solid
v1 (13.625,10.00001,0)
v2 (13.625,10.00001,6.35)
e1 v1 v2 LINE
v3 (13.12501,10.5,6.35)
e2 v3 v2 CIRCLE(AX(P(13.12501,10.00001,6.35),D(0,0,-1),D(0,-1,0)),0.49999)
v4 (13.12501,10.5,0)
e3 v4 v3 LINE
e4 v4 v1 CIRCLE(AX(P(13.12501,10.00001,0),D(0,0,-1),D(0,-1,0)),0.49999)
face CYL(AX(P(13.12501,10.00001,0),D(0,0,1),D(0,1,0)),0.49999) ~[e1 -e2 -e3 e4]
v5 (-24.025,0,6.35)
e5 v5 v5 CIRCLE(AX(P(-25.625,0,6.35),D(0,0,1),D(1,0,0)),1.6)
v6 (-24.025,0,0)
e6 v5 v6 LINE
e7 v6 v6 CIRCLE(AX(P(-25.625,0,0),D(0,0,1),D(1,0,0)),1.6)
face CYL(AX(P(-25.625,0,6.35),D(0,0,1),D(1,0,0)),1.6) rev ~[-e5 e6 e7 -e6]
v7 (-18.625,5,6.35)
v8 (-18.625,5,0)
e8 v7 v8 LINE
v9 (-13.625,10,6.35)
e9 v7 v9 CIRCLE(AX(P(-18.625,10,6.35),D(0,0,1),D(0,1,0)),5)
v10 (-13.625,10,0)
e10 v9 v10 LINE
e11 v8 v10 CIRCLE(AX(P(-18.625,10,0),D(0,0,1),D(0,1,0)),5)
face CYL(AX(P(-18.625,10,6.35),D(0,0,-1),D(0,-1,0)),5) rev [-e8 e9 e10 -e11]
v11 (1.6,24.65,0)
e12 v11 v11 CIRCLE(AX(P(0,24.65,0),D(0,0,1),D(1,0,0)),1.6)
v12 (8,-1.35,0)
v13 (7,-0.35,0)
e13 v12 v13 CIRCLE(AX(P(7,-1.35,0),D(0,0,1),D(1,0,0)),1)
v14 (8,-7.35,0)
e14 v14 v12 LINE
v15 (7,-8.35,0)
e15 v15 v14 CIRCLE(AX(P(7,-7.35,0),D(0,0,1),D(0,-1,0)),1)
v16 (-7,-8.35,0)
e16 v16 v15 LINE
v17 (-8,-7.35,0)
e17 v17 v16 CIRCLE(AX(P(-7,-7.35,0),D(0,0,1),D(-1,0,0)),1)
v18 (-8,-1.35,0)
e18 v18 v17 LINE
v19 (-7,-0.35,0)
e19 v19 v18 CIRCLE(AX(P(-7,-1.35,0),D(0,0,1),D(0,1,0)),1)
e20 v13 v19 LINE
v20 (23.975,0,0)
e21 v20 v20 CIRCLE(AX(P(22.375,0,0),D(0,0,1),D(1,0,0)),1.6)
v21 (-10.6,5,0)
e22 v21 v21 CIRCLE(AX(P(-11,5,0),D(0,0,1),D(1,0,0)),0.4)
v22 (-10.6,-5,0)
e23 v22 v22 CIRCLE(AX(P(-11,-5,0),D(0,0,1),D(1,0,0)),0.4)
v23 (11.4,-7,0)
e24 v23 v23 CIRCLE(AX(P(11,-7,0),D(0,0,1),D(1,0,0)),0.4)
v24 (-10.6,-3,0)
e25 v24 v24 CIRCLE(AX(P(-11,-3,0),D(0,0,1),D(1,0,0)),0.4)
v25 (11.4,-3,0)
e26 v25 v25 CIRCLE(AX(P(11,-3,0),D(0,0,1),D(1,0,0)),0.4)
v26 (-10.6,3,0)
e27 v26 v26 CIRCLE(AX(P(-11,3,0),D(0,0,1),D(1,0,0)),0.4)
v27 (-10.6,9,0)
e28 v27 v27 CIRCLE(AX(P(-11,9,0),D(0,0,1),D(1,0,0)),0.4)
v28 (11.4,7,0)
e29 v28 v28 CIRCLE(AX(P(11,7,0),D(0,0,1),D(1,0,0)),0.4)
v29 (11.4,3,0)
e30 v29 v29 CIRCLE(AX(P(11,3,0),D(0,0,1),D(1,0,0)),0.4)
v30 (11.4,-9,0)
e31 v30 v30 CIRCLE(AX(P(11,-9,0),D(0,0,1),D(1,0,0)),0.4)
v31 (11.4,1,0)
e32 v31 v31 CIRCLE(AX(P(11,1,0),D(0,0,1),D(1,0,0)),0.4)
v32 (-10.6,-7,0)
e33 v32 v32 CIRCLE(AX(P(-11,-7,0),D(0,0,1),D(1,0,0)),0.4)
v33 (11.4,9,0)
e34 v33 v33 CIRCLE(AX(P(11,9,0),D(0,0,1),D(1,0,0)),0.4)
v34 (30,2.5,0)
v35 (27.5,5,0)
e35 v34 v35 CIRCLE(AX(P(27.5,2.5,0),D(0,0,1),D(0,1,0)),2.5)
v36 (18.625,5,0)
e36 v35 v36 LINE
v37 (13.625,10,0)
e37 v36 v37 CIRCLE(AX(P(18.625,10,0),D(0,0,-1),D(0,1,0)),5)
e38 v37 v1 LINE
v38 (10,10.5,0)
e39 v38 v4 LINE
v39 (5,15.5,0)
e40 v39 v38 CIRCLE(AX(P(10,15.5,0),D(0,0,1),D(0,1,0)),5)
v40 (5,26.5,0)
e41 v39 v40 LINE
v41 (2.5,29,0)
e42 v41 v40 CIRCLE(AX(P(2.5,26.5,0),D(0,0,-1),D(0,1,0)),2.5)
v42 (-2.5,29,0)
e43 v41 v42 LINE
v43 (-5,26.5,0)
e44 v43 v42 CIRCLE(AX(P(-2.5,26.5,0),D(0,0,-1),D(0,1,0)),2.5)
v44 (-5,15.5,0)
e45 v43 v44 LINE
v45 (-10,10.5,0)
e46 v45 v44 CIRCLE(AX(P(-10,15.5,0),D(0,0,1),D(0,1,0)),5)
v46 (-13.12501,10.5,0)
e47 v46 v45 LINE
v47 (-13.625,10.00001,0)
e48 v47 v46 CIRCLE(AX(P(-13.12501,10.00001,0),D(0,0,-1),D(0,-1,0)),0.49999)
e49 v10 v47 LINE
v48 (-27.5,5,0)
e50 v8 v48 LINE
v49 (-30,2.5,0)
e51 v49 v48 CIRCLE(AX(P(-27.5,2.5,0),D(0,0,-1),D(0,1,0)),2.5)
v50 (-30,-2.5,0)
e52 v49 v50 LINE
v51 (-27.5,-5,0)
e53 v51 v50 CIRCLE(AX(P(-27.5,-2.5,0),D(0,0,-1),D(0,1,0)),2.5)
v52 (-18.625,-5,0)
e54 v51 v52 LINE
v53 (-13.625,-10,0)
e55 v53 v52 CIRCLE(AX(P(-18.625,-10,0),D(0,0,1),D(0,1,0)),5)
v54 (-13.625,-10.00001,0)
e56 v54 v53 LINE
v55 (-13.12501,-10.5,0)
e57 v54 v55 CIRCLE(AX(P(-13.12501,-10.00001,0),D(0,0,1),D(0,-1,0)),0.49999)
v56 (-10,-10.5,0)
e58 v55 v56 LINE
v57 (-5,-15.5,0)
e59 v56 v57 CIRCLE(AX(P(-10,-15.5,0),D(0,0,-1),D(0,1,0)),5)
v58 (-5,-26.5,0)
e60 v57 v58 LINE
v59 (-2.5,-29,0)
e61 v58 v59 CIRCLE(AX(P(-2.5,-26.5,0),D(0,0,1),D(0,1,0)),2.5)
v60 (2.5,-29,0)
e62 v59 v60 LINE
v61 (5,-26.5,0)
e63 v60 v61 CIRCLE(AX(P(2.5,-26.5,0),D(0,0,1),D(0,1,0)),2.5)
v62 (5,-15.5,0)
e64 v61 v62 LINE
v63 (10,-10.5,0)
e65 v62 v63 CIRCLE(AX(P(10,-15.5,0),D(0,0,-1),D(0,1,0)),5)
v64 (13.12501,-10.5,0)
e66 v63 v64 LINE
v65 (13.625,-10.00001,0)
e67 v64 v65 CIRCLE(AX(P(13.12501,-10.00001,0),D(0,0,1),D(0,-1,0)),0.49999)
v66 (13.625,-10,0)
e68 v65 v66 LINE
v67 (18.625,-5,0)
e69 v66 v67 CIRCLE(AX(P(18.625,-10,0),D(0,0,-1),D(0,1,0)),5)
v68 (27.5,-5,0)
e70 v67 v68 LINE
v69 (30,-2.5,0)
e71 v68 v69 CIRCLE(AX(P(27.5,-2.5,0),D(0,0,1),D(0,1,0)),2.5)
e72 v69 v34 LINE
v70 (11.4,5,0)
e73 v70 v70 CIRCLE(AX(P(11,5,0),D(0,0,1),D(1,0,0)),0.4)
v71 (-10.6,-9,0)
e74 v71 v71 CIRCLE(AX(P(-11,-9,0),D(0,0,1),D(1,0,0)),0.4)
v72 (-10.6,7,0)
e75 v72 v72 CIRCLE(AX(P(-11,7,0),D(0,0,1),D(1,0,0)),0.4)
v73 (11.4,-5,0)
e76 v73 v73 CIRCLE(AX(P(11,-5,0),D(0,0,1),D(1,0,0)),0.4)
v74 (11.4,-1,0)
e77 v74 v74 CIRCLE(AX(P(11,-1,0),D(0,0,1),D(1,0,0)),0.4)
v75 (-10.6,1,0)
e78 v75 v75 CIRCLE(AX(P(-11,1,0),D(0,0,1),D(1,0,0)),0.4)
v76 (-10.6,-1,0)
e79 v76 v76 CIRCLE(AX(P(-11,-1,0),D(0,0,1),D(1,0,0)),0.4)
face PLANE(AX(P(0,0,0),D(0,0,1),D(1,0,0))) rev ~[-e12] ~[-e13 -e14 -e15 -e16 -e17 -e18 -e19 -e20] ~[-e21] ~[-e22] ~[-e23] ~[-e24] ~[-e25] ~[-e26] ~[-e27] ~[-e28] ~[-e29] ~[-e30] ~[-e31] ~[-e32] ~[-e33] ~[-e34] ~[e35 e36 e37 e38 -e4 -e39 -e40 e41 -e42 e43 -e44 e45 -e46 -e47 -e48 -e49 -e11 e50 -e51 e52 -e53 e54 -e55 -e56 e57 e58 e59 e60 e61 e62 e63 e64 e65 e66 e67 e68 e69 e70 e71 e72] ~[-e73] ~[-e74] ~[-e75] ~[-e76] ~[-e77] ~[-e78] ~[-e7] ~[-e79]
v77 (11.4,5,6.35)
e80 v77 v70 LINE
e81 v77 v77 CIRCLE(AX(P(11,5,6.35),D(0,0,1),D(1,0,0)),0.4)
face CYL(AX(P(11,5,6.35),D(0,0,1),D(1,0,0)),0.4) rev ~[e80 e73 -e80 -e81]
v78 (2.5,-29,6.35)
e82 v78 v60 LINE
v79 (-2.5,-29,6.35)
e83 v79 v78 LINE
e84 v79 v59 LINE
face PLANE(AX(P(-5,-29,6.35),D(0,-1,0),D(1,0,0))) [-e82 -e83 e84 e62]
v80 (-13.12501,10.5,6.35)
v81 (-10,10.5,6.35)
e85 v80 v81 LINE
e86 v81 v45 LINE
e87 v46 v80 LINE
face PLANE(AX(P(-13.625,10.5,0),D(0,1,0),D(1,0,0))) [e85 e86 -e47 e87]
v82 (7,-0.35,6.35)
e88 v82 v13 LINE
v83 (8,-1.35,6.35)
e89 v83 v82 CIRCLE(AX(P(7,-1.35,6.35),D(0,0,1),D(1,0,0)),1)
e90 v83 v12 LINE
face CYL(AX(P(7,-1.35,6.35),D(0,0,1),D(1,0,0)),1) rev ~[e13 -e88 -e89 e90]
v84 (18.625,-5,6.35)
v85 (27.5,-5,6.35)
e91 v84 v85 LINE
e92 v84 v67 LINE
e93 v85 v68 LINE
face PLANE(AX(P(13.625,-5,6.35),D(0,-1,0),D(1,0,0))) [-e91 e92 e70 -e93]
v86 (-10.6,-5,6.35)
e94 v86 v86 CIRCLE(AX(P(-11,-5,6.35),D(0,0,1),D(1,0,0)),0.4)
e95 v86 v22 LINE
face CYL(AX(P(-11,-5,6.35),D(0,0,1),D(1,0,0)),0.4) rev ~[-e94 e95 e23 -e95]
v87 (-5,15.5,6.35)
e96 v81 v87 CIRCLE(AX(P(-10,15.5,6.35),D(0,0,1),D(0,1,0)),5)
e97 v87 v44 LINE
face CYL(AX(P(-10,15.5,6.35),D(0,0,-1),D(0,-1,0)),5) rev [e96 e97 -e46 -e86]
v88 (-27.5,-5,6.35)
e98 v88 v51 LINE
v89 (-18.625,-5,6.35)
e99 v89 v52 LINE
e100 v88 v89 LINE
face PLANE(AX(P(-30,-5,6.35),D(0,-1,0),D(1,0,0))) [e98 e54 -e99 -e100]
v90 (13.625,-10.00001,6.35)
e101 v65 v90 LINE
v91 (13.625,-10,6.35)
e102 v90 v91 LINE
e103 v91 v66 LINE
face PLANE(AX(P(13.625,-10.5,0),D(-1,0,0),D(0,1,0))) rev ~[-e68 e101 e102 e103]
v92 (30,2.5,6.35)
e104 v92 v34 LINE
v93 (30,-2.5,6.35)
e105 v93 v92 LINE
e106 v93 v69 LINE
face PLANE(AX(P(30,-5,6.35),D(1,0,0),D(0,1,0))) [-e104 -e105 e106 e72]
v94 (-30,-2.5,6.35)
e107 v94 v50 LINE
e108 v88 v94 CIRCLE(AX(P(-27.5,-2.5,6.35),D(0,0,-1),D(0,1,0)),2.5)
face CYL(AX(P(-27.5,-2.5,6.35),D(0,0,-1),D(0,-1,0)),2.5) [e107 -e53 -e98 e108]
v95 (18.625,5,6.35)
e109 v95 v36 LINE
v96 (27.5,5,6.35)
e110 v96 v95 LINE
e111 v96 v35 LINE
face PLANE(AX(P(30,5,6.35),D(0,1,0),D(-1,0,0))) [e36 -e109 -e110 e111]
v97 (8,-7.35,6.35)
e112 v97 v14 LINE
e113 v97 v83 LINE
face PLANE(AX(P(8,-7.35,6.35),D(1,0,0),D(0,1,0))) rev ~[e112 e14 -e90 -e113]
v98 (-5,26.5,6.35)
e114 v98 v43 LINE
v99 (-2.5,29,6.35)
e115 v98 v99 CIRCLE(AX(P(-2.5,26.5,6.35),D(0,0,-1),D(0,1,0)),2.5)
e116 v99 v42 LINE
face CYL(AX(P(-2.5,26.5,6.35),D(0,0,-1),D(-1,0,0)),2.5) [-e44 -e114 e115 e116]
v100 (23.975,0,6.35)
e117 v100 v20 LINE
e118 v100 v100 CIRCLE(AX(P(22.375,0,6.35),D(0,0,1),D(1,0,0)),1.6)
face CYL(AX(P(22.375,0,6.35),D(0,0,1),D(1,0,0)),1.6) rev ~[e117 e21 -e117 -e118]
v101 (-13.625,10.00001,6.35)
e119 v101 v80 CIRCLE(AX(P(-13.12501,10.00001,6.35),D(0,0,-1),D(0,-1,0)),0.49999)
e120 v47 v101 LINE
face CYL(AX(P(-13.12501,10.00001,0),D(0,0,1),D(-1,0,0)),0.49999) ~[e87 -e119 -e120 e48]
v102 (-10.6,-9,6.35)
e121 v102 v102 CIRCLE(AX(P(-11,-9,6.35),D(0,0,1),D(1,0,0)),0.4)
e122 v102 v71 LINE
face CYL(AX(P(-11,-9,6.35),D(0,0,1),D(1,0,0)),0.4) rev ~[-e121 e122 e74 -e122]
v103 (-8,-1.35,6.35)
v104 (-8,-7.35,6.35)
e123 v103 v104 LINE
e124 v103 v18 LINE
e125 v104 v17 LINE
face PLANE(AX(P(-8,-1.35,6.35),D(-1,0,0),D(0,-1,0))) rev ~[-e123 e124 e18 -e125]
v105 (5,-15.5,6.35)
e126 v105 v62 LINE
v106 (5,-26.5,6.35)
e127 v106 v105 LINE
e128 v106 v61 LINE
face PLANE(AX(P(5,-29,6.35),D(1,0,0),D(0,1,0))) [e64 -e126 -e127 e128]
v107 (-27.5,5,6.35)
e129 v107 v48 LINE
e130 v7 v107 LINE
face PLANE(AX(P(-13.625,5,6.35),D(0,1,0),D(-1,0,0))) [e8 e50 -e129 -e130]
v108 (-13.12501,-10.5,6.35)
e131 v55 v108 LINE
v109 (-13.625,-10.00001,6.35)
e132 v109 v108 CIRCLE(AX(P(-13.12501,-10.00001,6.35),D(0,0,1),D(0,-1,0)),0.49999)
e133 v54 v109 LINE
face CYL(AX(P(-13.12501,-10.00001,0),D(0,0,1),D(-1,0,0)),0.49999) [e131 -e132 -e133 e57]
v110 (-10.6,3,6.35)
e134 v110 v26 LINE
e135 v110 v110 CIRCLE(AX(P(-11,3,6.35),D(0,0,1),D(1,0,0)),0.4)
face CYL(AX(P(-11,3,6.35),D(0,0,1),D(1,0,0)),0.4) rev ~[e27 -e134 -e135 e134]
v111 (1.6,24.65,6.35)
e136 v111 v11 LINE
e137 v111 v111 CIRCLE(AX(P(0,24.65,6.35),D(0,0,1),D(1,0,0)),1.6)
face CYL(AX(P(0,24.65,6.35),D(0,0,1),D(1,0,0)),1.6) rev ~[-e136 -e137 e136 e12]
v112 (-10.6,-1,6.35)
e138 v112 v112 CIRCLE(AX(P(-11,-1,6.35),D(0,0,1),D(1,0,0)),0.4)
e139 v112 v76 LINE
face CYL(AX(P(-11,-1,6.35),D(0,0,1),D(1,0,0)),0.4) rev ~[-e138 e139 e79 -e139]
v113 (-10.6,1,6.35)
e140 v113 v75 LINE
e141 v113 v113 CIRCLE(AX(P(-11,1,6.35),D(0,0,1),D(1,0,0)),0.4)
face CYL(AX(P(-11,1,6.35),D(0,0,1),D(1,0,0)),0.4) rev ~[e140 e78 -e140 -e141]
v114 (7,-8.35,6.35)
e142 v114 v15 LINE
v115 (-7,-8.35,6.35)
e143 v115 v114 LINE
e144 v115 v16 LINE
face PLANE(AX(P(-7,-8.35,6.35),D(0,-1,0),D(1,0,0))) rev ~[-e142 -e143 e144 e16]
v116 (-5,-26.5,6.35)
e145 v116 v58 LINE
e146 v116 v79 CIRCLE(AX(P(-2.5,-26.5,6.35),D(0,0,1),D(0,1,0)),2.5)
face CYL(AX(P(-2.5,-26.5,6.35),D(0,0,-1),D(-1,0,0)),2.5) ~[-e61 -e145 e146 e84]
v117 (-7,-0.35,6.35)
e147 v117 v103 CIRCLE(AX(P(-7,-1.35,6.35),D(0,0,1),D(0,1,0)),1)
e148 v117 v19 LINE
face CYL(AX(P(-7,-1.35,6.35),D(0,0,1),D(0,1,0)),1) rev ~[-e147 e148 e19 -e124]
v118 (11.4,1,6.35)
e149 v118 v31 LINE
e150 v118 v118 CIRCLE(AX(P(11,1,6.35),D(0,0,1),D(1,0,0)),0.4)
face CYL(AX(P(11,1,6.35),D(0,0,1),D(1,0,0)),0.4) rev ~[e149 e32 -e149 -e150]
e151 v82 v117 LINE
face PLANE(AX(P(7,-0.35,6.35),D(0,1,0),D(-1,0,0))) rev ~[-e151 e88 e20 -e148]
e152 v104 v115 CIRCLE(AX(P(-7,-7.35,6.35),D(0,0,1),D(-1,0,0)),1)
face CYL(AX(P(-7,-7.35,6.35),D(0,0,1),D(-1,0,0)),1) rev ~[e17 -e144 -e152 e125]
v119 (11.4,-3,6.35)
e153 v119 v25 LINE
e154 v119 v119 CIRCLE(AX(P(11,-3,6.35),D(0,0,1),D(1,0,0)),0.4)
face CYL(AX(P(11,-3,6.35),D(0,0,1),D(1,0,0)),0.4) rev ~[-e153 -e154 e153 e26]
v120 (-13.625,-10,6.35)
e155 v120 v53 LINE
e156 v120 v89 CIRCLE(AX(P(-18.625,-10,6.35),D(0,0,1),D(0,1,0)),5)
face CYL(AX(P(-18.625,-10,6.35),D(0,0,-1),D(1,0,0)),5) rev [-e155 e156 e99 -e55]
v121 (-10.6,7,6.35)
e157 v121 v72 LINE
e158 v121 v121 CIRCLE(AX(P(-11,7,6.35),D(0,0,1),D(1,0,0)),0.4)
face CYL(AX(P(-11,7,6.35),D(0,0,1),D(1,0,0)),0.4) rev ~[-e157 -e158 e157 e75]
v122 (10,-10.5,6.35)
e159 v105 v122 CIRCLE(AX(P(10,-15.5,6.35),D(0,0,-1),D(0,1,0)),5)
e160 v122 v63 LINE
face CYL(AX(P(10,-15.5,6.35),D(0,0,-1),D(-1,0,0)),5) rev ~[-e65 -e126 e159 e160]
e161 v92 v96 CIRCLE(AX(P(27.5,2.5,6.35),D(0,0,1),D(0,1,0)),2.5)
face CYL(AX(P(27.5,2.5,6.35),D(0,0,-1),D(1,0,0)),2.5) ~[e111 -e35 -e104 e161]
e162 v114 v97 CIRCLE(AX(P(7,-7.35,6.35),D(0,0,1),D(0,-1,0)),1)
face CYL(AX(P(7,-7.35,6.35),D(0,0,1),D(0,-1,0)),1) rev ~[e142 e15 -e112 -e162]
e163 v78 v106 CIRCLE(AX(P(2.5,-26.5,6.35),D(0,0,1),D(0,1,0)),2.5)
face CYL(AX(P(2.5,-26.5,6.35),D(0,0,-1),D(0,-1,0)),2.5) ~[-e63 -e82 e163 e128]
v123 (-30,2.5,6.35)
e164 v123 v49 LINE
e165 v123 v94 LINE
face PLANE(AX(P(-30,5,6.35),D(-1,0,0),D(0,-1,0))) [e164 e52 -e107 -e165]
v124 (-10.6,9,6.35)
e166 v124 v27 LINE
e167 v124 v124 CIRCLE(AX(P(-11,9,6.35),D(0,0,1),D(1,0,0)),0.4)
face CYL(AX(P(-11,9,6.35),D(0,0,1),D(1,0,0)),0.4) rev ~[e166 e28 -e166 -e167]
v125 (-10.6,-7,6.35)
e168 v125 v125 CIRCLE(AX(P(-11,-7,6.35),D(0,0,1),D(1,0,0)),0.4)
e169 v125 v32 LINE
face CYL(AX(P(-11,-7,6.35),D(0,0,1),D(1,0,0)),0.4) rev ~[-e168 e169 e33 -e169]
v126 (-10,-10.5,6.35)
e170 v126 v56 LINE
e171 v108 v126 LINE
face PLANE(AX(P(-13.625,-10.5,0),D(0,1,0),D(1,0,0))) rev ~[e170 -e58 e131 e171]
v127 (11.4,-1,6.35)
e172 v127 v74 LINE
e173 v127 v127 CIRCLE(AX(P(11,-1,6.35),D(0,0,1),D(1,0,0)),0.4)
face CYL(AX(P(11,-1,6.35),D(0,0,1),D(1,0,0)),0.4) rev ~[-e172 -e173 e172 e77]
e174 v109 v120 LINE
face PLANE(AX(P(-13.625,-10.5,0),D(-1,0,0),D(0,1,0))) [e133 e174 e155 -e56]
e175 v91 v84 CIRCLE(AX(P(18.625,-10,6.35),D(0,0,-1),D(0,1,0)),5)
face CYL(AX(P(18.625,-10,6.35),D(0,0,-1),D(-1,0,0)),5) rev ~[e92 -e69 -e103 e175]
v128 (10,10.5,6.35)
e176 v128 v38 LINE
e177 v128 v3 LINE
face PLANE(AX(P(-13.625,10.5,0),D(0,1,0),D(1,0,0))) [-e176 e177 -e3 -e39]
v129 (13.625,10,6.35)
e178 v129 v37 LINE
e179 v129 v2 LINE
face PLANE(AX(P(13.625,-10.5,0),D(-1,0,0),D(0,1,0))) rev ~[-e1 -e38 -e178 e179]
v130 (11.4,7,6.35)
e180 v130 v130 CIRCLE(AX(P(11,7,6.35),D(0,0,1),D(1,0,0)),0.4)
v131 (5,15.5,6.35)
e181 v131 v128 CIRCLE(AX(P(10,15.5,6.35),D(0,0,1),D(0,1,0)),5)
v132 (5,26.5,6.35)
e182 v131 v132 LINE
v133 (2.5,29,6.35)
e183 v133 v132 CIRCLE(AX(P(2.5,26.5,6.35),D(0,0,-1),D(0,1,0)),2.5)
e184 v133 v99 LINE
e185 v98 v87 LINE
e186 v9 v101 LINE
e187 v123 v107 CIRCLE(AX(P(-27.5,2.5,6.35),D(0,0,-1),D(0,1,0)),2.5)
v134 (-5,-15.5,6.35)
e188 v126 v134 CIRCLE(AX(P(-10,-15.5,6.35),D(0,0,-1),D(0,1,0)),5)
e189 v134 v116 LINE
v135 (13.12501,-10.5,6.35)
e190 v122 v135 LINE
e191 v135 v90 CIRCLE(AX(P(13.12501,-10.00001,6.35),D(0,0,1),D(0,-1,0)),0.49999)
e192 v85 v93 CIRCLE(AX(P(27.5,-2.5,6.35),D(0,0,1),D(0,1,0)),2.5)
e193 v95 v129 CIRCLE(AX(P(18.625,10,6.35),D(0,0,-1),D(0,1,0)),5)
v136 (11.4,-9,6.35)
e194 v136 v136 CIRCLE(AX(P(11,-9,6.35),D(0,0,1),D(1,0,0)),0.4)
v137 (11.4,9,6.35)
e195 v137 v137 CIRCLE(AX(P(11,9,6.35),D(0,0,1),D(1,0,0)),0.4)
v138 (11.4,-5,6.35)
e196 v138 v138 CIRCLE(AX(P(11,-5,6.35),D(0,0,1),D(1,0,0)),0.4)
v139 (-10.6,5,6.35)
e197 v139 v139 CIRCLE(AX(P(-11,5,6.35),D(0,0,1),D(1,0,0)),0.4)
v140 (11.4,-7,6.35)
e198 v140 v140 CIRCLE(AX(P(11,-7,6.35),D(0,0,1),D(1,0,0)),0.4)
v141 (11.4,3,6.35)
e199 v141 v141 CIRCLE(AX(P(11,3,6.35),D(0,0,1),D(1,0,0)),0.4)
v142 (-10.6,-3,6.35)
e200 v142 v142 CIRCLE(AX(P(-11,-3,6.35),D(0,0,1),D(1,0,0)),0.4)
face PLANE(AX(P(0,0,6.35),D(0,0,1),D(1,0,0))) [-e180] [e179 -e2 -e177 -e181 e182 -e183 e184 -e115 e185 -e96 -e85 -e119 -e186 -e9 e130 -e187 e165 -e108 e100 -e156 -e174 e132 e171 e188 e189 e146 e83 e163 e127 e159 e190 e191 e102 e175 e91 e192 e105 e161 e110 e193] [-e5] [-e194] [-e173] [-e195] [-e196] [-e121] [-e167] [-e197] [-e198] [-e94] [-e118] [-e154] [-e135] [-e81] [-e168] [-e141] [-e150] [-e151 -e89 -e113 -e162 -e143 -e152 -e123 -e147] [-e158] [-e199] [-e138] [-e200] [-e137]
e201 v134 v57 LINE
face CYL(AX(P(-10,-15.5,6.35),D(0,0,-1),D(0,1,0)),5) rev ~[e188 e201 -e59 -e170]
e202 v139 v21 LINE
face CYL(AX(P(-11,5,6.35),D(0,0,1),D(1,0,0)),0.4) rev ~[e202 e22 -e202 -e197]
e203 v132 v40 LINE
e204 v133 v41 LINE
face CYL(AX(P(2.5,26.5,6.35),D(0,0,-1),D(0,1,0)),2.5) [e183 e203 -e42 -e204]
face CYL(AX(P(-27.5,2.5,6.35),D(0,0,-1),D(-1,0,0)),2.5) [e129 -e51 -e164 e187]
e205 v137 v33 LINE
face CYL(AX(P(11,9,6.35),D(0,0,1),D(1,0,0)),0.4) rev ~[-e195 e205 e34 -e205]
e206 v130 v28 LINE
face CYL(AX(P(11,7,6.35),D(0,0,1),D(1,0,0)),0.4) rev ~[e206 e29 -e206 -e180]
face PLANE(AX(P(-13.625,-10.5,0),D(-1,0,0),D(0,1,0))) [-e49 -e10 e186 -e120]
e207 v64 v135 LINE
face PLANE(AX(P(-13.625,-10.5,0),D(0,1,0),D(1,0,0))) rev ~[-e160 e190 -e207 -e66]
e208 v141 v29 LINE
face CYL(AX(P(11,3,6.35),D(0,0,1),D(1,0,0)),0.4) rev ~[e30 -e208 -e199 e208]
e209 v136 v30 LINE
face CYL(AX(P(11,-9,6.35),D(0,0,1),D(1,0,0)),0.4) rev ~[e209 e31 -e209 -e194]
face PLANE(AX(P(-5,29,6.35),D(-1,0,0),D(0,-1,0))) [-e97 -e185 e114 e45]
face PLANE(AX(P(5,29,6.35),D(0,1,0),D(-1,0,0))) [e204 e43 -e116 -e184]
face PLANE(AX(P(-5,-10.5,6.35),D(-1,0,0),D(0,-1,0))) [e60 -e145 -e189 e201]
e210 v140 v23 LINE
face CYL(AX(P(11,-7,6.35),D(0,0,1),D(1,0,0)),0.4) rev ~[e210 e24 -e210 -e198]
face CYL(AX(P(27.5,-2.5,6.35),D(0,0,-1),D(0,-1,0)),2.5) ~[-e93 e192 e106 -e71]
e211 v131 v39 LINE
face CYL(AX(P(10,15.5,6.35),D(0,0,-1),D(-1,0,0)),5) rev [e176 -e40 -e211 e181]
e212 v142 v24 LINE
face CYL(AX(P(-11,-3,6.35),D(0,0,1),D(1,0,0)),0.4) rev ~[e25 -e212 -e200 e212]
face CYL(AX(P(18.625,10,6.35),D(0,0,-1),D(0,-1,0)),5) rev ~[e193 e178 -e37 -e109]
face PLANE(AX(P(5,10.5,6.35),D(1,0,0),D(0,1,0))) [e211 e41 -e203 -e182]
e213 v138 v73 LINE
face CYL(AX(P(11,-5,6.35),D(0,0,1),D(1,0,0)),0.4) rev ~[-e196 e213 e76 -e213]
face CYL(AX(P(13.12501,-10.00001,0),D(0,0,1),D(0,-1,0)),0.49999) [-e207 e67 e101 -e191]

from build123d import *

# Parameters (mm, degrees)
F0_W      = 27.25
F0_H      = 21
F1_DEPTH  = 6.35
F2_R      = 0.4
F3_DEPTH  = 25.4
F5_DEPTH  = 6.35
F6_R      = 1.6
F7_DEPTH  = 25.4
F8_R      = 5
F9_R      = 2.5
F10_R     = 0.49999
F12_DEPTH = 25.4


# Not quite as in the source:
# - a fillet or chamfer is up to 0.001 mm smaller than in the source, because OpenCascade refuses the exact size


with BuildPart() as f1:
    # F0 (on Top) → F1 (new body)
    with BuildSketch(Plane.XY):
        Rectangle(F0_W, F0_H)
    extrude(amount=F1_DEPTH)

    # F2 (on face) → F3 (cut)
    with BuildSketch(Plane.XY.offset(6.35)):
        with Locations((11, 1)):
            Circle(F2_R)
        with Locations((11, 3)):
            Circle(F2_R)
        with Locations((11, 5)):
            Circle(F2_R)
        with Locations((11, 7)):
            Circle(F2_R)
        with Locations((11, 9)):
            Circle(F2_R)
        with Locations((11, -1)):
            Circle(F2_R)
        with Locations((11, -3)):
            Circle(F2_R)
        with Locations((11, -5)):
            Circle(F2_R)
        with Locations((11, -7)):
            Circle(F2_R)
        with Locations((11, -9)):
            Circle(F2_R)
        with Locations((-11, 9)):
            Circle(F2_R)
        with Locations((-11, 7)):
            Circle(F2_R)
        with Locations((-11, 5)):
            Circle(F2_R)
        with Locations((-11, 3)):
            Circle(F2_R)
        with Locations((-11, 1)):
            Circle(F2_R)
        with Locations((-11, -1)):
            Circle(F2_R)
        with Locations((-11, -3)):
            Circle(F2_R)
        with Locations((-11, -5)):
            Circle(F2_R)
        with Locations((-11, -7)):
            Circle(F2_R)
        with Locations((-11, -9)):
            Circle(F2_R)
    extrude(amount=-F3_DEPTH, mode=Mode.SUBTRACT)

    # F4 (on face) → F5 (join)
    with BuildSketch(Plane.XY.offset(6.35)):
        Polygon((5, 29), (0, 29), (-5, 29), (-5, 10.5), (0, 10.5), (5, 10.5), align=None)
        Polygon((-5, -10.5), (-5, -29), (0, -29), (5, -29), (5, -10.5), (0, -10.5), align=None)
        Polygon((-30, 5), (-30, 0), (-30, -5), (-13.625, -5), (-13.625, 0), (-13.625, 5), align=None)
        Polygon((30, 5), (13.625, 5), (13.625, 0), (13.625, -5), (30, -5), (30, 0), align=None)
    extrude(amount=-F5_DEPTH)

    # F6 (on face) → F7 (cut)
    with BuildSketch(Plane.XY.offset(6.35)):
        with Locations((-25.625, 0)):
            Circle(F6_R)
        with Locations((22.375, 0)):
            Circle(F6_R)
        with Locations((0, 24.65)):
            Circle(F6_R)
    extrude(amount=-F7_DEPTH, mode=Mode.SUBTRACT)

    # F8
    f8_edges = [f1.edges().sort_by_distance(p)[0] for p in [
        (-5, 10.5, 3.175),
        (-13.625, 5, 3.175),
        (-13.625, -5, 3.175),
        (-5, -10.5, 3.175),
        (5, 10.5, 3.175),
        (13.625, 5, 3.175),
        (13.625, -5, 3.175),
        (5, -10.5, 3.175),
    ]]
    fillet(f8_edges, radius=F8_R)

    # F9
    f9_edges = [f1.edges().sort_by_distance(p)[0] for p in [
        (-30, 5, 3.175),
        (-5, 29, 3.175),
        (5, 29, 3.175),
        (-30, -5, 3.175),
        (-5, -29, 3.175),
        (5, -29, 3.175),
        (30, 5, 3.175),
        (30, -5, 3.175),
    ]]
    fillet(f9_edges, radius=F9_R)

    # F10 (radius 0.5 in the source; OpenCascade refuses exactly that, so slightly less here)
    f10_edges = [f1.edges().sort_by_distance(p)[0] for p in [
        (-13.625, -10.5, 3.175),
        (13.625, -10.5, 3.175),
        (-13.625, 10.5, 3.175),
        (13.625, 10.5, 3.175),
    ]]
    fillet(f10_edges, radius=F10_R)

    # F11 (on face) → F12 (cut)
    with BuildSketch(Plane.XY.offset(6.35)):
        with BuildLine():
            Line((7, -0.35), (-7, -0.35))
            ThreePointArc((-7, -0.35), (-7.7071067812, -0.6428932188), (-8, -1.35))
            Line((-8, -1.35), (-8, -7.35))
            ThreePointArc((-8, -7.35), (-7.7071067812, -8.0571067812), (-7, -8.35))
            Line((-7, -8.35), (7, -8.35))
            ThreePointArc((7, -8.35), (7.7071067812, -8.0571067812), (8, -7.35))
            Line((8, -7.35), (8, -1.35))
            ThreePointArc((8, -1.35), (7.7071067812, -0.6428932188), (7, -0.35))
        make_face()
    extrude(amount=-F12_DEPTH, mode=Mode.SUBTRACT)


solid = f1.part
